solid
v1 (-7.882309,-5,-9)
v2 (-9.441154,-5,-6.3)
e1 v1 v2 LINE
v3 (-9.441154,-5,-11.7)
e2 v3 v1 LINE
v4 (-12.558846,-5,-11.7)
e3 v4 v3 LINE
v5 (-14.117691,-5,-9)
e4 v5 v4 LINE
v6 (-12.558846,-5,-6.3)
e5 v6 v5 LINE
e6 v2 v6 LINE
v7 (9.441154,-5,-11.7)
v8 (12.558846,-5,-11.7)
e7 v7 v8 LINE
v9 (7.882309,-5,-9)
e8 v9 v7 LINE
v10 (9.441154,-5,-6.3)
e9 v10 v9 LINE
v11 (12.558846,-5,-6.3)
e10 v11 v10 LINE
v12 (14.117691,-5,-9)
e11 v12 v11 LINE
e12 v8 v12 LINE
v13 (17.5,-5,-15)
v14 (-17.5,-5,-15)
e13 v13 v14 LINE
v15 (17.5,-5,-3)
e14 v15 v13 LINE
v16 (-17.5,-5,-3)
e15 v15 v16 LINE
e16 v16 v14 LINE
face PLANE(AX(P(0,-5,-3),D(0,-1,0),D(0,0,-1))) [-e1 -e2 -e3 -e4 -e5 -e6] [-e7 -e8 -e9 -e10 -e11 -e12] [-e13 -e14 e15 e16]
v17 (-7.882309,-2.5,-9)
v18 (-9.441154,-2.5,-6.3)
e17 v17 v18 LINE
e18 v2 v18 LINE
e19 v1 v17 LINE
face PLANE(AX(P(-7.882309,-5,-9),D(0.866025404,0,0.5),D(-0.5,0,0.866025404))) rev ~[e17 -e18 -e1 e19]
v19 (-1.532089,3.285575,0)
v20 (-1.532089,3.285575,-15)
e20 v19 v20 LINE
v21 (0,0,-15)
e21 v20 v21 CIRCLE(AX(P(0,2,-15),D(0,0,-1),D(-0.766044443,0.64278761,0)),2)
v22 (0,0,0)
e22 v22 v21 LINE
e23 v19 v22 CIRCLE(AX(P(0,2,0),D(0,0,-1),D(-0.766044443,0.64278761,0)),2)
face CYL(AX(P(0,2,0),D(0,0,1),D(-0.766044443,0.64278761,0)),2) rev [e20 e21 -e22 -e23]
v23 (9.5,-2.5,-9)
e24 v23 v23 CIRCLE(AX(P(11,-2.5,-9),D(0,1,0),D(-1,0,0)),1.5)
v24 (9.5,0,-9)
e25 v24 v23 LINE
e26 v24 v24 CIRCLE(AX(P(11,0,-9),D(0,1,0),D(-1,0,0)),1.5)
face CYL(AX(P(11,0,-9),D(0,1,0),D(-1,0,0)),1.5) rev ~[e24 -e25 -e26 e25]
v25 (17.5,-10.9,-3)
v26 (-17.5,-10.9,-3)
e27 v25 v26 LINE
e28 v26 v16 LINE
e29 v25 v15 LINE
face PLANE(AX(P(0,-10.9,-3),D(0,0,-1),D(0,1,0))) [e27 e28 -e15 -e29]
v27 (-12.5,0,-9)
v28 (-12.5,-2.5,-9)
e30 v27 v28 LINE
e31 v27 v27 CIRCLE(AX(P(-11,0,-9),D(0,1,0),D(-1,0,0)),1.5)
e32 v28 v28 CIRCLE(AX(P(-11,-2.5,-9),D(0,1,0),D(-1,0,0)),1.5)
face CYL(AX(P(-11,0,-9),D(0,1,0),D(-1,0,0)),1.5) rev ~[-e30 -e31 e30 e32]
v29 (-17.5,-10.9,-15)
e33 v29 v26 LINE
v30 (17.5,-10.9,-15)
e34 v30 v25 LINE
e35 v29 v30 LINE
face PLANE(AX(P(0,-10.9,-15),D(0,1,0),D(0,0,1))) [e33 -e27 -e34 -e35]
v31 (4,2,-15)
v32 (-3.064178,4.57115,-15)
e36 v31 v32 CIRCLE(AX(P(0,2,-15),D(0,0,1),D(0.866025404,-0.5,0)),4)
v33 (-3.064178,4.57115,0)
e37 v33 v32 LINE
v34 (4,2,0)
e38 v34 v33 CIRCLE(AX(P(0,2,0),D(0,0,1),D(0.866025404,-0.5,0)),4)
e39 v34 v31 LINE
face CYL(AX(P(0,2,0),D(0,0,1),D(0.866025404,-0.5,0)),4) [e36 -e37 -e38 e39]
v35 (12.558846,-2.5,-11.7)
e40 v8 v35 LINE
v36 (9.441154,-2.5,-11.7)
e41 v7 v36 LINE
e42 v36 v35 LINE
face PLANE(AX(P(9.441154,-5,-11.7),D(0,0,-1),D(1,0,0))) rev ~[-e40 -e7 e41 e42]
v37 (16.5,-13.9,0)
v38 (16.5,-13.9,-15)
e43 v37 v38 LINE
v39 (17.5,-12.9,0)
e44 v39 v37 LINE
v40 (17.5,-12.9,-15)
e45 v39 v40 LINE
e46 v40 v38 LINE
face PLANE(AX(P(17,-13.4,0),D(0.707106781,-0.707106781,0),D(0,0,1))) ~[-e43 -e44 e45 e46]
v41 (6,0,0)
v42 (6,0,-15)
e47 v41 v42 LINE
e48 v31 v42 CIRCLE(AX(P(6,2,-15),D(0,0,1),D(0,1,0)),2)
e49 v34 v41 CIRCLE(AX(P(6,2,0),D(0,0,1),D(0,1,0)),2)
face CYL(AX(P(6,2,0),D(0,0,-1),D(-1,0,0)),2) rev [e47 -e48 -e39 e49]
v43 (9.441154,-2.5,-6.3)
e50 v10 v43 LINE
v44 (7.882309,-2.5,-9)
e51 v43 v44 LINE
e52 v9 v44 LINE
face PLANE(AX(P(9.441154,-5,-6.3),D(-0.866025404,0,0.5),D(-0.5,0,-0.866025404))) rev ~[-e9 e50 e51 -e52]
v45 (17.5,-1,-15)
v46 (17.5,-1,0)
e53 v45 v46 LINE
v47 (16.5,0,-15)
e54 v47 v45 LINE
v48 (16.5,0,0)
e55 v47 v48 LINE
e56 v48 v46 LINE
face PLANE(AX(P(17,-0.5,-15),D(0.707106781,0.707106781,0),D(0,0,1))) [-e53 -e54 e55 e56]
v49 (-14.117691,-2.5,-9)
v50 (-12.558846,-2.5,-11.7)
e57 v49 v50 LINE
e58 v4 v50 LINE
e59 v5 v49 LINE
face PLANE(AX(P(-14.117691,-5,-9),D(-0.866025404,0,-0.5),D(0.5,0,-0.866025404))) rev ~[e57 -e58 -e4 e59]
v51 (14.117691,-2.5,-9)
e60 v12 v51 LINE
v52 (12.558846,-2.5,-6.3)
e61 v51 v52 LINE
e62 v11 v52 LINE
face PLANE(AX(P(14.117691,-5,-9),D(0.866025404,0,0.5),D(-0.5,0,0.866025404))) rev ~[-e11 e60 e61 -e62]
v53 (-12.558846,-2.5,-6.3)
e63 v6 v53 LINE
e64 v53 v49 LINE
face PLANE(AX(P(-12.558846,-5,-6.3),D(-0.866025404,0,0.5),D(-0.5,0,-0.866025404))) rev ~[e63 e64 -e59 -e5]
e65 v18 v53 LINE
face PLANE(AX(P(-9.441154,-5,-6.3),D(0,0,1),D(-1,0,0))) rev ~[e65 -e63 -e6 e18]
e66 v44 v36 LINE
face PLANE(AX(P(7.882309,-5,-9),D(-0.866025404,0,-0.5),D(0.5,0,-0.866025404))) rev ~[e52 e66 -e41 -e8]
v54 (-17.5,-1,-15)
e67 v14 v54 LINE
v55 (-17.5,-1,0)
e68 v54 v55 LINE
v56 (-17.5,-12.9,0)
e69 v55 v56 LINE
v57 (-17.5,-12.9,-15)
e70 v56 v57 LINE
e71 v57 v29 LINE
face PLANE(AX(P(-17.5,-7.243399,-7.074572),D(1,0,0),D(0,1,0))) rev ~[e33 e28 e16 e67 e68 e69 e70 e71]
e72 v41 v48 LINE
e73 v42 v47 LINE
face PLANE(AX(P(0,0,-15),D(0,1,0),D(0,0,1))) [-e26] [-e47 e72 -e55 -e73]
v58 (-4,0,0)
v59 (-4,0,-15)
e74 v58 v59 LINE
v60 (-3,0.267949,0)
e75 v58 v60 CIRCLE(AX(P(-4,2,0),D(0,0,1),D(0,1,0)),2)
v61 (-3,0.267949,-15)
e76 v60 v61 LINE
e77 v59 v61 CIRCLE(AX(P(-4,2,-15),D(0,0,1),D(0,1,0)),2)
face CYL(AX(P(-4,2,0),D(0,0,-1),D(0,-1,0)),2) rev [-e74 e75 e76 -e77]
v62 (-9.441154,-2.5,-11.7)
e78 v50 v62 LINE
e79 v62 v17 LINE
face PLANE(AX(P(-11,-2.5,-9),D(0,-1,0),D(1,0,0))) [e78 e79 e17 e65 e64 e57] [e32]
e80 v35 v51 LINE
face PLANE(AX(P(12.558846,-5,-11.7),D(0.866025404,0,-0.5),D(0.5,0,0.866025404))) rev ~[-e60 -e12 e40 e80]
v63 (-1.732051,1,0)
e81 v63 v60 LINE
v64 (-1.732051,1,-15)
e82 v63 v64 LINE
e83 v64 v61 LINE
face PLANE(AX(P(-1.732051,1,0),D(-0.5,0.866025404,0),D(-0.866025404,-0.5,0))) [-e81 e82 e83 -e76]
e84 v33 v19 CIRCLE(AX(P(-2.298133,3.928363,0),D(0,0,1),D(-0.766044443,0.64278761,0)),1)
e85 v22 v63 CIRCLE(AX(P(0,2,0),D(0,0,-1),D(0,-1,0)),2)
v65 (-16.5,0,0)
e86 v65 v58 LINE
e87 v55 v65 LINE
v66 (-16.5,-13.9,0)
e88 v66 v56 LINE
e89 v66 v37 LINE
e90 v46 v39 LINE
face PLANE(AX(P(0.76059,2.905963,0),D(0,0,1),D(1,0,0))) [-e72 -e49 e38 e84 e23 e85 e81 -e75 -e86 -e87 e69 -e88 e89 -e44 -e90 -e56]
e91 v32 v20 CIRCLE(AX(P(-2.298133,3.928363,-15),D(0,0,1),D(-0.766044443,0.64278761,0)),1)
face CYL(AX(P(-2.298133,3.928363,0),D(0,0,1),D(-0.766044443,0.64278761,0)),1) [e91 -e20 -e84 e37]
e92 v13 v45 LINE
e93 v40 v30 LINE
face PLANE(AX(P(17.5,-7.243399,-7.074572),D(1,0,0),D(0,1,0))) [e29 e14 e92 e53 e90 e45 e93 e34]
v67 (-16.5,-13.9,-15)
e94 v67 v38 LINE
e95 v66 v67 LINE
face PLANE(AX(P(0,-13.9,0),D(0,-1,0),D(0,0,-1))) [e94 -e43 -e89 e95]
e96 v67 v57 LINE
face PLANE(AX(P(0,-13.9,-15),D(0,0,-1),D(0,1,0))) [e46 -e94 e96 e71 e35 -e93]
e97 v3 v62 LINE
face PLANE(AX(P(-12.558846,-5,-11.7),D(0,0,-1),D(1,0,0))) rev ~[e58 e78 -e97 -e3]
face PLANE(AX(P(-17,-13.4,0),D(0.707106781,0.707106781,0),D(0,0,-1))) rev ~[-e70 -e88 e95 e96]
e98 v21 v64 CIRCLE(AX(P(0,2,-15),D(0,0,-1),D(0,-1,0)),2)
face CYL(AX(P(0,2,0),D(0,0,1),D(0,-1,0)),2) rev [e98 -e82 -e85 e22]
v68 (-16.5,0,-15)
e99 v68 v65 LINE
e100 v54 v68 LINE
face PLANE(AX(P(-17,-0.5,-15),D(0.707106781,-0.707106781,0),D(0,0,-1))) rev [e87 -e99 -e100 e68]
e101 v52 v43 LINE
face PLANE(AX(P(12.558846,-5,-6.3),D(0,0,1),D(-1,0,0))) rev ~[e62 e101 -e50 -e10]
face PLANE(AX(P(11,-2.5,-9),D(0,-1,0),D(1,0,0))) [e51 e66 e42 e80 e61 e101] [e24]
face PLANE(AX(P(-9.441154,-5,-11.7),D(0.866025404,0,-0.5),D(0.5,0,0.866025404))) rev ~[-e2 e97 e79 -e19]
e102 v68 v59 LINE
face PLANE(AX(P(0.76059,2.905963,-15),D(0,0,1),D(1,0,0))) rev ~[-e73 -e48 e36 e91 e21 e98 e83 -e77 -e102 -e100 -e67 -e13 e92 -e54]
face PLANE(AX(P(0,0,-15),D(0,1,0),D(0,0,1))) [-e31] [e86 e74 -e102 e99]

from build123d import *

# Parameters (mm, degrees)
F1_DEPTH = 17.5
F3_DEPTH = 15
F4_R     = 2
F5_SIZE  = 1
F7_DEPTH = 2.5
F8_R     = 1.5
F9_DEPTH = 2.5


with BuildPart() as f1:
    # F0 (on Right) → F1 (new body, symmetric)
    with BuildSketch(Plane.YZ):
        Polygon((-5, -15), (0, -15), (0, 0), (-13.9, 0), (-13.9, -15), (-10.9, -15), (-10.9, -3), (-5, -3), align=None)
    extrude(amount=F1_DEPTH, both=True)

    # F2 (on face) → F3 (join)
    with BuildSketch(Plane.XY):
        with BuildLine():
            Line((0, 0), (3.4641016151, 0))
            ThreePointArc((3.4641016151, 0), (2.2943057454, 5.2766081772), (-3.0641777725, 4.5711504387))
            ThreePointArc((-3.0641777725, 4.5711504387), (-2.940920939, 3.1623183859), (-1.5320888862, 3.2855752194))
            ThreePointArc((-1.5320888862, 3.2855752194), (1.8126155741, 2.8452365235), (0, 0))
        make_face()
        with BuildLine():
            Line((-3.4641016151, 0), (0, 0))
            ThreePointArc((0, 0), (-1, 0.2679491924), (-1.7320508076, 1))
            Line((-1.7320508076, 1), (-3.4641016151, 0))
        make_face()
    extrude(amount=-F3_DEPTH)

    # F4
    f4_edges = [f1.edges().sort_by_distance(p)[0] for p in [
        (3.464102, 0, -7.5),
        (-3.464102, 0, -7.5),
    ]]
    fillet(f4_edges, radius=F4_R)

    # F5
    f5_edges = [f1.edges().sort_by_distance(p)[0] for p in [
        (-17.5, 0, -7.5),
        (17.5, 0, -7.5),
        (-17.5, -13.9, -7.5),
        (17.5, -13.9, -7.5),
    ]]
    chamfer(f5_edges, length=F5_SIZE)

    # F6 (on face) → F7 (cut)
    with BuildSketch(Plane.XZ.offset(5)):
        Polygon((-12.5588457268, -11.7), (-9.4411542732, -11.7), (-7.8823085464, -9), (-9.4411542732, -6.3), (-12.5588457268, -6.3), (-14.1176914536, -9), align=None)
        Polygon((9.4411542732, -11.7), (12.5588457268, -11.7), (14.1176914536, -9), (12.5588457268, -6.3), (9.4411542732, -6.3), (7.8823085464, -9), align=None)
    extrude(amount=-F7_DEPTH, mode=Mode.SUBTRACT)

    # F8 (on face) → F9 (cut, through all)
    with BuildSketch(Plane(origin=(0, 0, 0), x_dir=(-1, 0, 0), z_dir=(0, 1, 0))):
        with Locations((-11, -9)):
            Circle(F8_R)
        with Locations((11, -9)):
            Circle(F8_R)
    extrude(amount=-F9_DEPTH, mode=Mode.SUBTRACT)


solid = f1.part
